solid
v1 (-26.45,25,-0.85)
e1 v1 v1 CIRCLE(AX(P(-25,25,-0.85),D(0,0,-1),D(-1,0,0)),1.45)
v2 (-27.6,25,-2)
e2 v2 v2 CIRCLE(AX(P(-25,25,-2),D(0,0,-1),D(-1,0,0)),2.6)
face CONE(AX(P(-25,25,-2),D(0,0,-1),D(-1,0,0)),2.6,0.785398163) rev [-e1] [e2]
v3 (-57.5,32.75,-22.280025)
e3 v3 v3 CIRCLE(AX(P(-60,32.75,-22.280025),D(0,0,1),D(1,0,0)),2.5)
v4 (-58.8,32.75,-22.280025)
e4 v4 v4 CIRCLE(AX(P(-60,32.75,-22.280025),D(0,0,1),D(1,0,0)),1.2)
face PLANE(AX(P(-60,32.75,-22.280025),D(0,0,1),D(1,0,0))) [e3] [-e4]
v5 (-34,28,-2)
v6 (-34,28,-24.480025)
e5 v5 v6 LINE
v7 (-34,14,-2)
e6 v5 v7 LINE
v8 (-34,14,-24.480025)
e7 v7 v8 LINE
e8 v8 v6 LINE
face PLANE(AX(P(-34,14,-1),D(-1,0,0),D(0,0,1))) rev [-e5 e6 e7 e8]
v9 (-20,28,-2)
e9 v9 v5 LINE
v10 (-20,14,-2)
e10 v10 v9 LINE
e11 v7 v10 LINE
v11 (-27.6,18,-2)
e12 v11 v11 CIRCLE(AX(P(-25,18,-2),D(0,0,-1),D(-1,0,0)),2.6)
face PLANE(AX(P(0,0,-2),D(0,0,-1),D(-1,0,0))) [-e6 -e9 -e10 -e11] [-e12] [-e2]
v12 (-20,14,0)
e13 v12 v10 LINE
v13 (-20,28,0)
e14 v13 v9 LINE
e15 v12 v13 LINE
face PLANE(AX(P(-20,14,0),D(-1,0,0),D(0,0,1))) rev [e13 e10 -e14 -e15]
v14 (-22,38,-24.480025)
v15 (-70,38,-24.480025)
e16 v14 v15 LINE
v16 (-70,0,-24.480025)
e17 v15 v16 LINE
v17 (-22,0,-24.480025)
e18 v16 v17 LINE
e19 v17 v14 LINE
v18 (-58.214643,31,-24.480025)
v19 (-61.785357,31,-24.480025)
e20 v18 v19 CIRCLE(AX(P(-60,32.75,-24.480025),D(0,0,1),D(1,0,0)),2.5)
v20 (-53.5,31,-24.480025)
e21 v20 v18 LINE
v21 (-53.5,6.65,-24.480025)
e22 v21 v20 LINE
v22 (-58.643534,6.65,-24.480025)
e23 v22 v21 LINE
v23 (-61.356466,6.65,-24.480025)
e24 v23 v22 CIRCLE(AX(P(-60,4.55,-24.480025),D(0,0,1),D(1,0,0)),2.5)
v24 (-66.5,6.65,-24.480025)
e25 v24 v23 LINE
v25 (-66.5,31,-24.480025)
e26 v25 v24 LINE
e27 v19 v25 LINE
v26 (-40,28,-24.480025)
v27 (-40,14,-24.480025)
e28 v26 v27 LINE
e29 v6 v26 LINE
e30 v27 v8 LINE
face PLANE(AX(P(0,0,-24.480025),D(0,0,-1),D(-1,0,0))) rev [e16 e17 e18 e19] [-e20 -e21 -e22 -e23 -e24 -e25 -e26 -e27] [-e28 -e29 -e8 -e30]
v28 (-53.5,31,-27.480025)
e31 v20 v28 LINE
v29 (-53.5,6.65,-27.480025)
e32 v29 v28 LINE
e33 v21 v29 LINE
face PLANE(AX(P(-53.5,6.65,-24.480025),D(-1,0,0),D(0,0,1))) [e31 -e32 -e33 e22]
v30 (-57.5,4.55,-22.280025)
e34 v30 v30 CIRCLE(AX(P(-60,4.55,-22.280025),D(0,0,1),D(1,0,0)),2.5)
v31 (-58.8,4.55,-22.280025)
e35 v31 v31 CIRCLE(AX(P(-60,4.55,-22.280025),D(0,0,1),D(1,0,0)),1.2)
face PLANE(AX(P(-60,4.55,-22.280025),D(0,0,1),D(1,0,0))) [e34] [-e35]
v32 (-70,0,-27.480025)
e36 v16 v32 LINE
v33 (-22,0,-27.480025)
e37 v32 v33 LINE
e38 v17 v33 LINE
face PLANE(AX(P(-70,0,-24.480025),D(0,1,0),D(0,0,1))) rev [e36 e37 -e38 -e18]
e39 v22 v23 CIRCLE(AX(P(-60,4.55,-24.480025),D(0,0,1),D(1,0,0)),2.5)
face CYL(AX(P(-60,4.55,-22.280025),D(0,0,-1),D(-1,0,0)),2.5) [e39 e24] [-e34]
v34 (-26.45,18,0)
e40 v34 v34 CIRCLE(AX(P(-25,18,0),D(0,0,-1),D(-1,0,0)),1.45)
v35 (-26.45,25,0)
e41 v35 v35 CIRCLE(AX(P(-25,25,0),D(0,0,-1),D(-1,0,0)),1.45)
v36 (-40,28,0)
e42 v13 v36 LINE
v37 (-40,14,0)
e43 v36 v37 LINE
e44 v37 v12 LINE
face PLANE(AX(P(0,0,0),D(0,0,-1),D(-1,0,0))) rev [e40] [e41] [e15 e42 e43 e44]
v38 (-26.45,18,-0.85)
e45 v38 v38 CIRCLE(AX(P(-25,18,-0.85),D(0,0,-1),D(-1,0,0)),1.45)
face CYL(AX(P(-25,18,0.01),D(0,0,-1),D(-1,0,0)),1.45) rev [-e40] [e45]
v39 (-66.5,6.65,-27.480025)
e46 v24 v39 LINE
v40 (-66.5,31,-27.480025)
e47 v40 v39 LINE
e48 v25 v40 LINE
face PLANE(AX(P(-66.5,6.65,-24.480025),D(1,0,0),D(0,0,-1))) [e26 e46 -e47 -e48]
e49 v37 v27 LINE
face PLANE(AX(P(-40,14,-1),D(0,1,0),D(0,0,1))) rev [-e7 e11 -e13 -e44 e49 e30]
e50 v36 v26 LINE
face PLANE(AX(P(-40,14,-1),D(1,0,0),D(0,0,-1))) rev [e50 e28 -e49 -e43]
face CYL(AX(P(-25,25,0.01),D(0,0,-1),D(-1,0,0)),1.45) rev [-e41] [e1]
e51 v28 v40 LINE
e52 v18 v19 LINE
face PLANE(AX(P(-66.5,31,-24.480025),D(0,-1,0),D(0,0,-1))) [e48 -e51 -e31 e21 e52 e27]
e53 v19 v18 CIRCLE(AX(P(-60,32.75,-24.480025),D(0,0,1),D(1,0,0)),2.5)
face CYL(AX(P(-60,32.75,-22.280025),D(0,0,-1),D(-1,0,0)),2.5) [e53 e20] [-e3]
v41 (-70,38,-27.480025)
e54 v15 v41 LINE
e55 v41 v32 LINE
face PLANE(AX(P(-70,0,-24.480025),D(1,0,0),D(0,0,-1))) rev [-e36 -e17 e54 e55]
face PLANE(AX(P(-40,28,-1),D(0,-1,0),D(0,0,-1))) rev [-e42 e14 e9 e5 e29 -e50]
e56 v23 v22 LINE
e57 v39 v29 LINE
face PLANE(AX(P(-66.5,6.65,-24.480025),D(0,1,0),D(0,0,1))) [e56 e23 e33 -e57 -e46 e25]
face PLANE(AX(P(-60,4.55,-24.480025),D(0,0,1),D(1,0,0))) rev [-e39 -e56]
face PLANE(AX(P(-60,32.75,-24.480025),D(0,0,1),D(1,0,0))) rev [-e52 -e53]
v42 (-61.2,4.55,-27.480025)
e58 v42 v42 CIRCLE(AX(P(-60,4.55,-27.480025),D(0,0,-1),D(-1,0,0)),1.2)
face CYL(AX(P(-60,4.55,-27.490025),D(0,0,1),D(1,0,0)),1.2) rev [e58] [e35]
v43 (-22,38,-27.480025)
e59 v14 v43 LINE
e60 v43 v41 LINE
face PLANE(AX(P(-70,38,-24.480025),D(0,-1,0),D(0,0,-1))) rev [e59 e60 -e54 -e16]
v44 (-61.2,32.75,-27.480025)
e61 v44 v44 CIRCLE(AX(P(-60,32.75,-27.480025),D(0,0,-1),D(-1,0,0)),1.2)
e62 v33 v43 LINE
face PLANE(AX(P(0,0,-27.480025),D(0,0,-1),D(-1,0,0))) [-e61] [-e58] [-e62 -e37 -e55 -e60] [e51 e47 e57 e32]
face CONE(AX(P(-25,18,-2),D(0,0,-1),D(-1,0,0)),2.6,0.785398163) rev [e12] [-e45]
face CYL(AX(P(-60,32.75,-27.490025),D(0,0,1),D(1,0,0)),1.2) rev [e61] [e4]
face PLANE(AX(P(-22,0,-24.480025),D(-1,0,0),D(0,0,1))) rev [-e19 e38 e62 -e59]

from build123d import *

# Parameters (mm, degrees)
SERVO_SHELF_START                        = -27.480025
SKETCH1_W                                = 48
SKETCH1_H                                = 38
SKETCH1_W_2                              = 13
SKETCH1_H_2                              = 24.35
SERVO_SHELF_DEPTH                        = 3
OUTBOARD_RISER_START                     = -25.480025
SKETCH2_W                                = 6
SKETCH2_H                                = 14
OUTBOARD_RISER_DEPTH                     = 24.480025
PLATE_ATTACHMENT_FOOT_START              = -2
SKETCH3_W                                = 20
SKETCH3_H                                = 14
PLATE_ATTACHMENT_FOOT_DEPTH              = 2
SKETCH4_R                                = 1.45
SERVO_PAD_D2P9_DEPTH                     = 2.01
SKETCH5_R                                = 2.6
SERVO_PAD_CSK_D5P2_90DEG_DEPTH           = 1.15
SERVO_PAD_CSK_D5P2_90DEG_DRAFT           = -45
SERVO_PAD_CSK_D5P2_90DEG_PROFILE_2_DEPTH = 1.15
SERVO_PAD_CSK_D5P2_90DEG_PROFILE_2_DRAFT = -45
SERVO_EAR_SUPPORTS_H2P2_START            = -24.480025
SKETCH6_R                                = 2.5
SERVO_EAR_SUPPORTS_H2P2_DEPTH            = 2.2
SKETCH7_R                                = 1.2
SERVO_EAR_D2P4_THROUGH_DEPTH             = 5.21


with BuildPart() as part:
    # Sketch1 → Servo_Shelf (new body)
    with BuildSketch(Plane.XY.offset(SERVO_SHELF_START)):
        with Locations((-46, 19)):
            Rectangle(SKETCH1_W, SKETCH1_H)
        with Locations((-60, 18.825)):
            Rectangle(SKETCH1_W_2, SKETCH1_H_2, mode=Mode.SUBTRACT)
    extrude(amount=SERVO_SHELF_DEPTH)

    # Sketch2 → Outboard_Riser (add)
    with BuildSketch(Plane.XY.offset(OUTBOARD_RISER_START)):
        with Locations((-37, 21)):
            Rectangle(SKETCH2_W, SKETCH2_H)
    extrude(amount=OUTBOARD_RISER_DEPTH)

    # Sketch3 → Plate_Attachment_Foot (add)
    with BuildSketch(Plane.XY.offset(PLATE_ATTACHMENT_FOOT_START)):
        with Locations((-30, 21)):
            Rectangle(SKETCH3_W, SKETCH3_H)
    extrude(amount=PLATE_ATTACHMENT_FOOT_DEPTH)

    # Sketch4 → Servo_Pad_D2p9 (cut)
    with BuildSketch(Plane(origin=(0, 0, -2), x_dir=(-1, 0, 0), z_dir=(0, 0, -1))):
        with Locations((25, 18)):
            Circle(SKETCH4_R)
        with Locations((25, 25)):
            Circle(SKETCH4_R)
    extrude(amount=-SERVO_PAD_D2P9_DEPTH, mode=Mode.SUBTRACT)


with BuildPart() as servo_pad_csk_d5p2_90deg_tool:
    # Sketch5 → Servo_Pad_CSK_D5p2_90deg (with draft: the straight prism first)
    with BuildSketch(Plane(origin=(0, 0, -2), x_dir=(-1, 0, 0), z_dir=(0, 0, -1))):
        with Locations((25, 18)):
            Circle(SKETCH5_R)
    extrude(amount=-SERVO_PAD_CSK_D5P2_90DEG_DEPTH)
    # Servo_Pad_CSK_D5p2_90deg: the draft: its side faces are tilted about the plane it starts from
    servo_pad_csk_d5p2_90deg_sides = [servo_pad_csk_d5p2_90deg_tool.faces().sort_by_distance(p)[0] for p in [
        (-22.4, 18, -1.425),
    ]]
    draft(servo_pad_csk_d5p2_90deg_sides, Plane(origin=(0, 0, -2), x_dir=(-1, 0, 0), z_dir=(0, 0, -1)), SERVO_PAD_CSK_D5P2_90DEG_DRAFT)


with BuildPart() as part_1:
    add(part.part)

    # Servo_Pad_CSK_D5p2_90deg: cut by servo_pad_csk_d5p2_90deg_tool
    add(servo_pad_csk_d5p2_90deg_tool.part, mode=Mode.SUBTRACT)


with BuildPart() as servo_pad_csk_d5p2_90deg_profile_2_tool:
    # Sketch5 → Servo_Pad_CSK_D5p2_90deg profile 2 (with draft: the straight prism first)
    with BuildSketch(Plane(origin=(0, 0, -2), x_dir=(-1, 0, 0), z_dir=(0, 0, -1))):
        with Locations((25, 25)):
            Circle(SKETCH5_R)
    extrude(amount=-SERVO_PAD_CSK_D5P2_90DEG_PROFILE_2_DEPTH)
    # Servo_Pad_CSK_D5p2_90deg profile 2: the draft: its side faces are tilted about the plane it starts from
    servo_pad_csk_d5p2_90deg_profile_2_sides = [servo_pad_csk_d5p2_90deg_profile_2_tool.faces().sort_by_distance(p)[0] for p in [
        (-22.4, 25, -1.425),
    ]]
    draft(servo_pad_csk_d5p2_90deg_profile_2_sides, Plane(origin=(0, 0, -2), x_dir=(-1, 0, 0), z_dir=(0, 0, -1)), SERVO_PAD_CSK_D5P2_90DEG_PROFILE_2_DRAFT)


with BuildPart() as part_2:
    add(part_1.part)

    # Servo_Pad_CSK_D5p2_90deg profile 2: cut by servo_pad_csk_d5p2_90deg_profile_2_tool
    add(servo_pad_csk_d5p2_90deg_profile_2_tool.part, mode=Mode.SUBTRACT)

    # Sketch6 → Servo_Ear_Supports_H2p2 (add)
    with BuildSketch(Plane.XY.offset(SERVO_EAR_SUPPORTS_H2P2_START)):
        with Locations((-60, 4.55)):
            Circle(SKETCH6_R)
        with Locations((-60, 32.75)):
            Circle(SKETCH6_R)
    extrude(amount=SERVO_EAR_SUPPORTS_H2P2_DEPTH)

    # Sketch7 → Servo_Ear_D2p4_Through (cut)
    with BuildSketch(Plane.XY.offset(-22.280025)):
        with Locations((-60, 4.55)):
            Circle(SKETCH7_R)
        with Locations((-60, 32.75)):
            Circle(SKETCH7_R)
    extrude(amount=-SERVO_EAR_D2P4_THROUGH_DEPTH, mode=Mode.SUBTRACT)


solid = part_2.part
